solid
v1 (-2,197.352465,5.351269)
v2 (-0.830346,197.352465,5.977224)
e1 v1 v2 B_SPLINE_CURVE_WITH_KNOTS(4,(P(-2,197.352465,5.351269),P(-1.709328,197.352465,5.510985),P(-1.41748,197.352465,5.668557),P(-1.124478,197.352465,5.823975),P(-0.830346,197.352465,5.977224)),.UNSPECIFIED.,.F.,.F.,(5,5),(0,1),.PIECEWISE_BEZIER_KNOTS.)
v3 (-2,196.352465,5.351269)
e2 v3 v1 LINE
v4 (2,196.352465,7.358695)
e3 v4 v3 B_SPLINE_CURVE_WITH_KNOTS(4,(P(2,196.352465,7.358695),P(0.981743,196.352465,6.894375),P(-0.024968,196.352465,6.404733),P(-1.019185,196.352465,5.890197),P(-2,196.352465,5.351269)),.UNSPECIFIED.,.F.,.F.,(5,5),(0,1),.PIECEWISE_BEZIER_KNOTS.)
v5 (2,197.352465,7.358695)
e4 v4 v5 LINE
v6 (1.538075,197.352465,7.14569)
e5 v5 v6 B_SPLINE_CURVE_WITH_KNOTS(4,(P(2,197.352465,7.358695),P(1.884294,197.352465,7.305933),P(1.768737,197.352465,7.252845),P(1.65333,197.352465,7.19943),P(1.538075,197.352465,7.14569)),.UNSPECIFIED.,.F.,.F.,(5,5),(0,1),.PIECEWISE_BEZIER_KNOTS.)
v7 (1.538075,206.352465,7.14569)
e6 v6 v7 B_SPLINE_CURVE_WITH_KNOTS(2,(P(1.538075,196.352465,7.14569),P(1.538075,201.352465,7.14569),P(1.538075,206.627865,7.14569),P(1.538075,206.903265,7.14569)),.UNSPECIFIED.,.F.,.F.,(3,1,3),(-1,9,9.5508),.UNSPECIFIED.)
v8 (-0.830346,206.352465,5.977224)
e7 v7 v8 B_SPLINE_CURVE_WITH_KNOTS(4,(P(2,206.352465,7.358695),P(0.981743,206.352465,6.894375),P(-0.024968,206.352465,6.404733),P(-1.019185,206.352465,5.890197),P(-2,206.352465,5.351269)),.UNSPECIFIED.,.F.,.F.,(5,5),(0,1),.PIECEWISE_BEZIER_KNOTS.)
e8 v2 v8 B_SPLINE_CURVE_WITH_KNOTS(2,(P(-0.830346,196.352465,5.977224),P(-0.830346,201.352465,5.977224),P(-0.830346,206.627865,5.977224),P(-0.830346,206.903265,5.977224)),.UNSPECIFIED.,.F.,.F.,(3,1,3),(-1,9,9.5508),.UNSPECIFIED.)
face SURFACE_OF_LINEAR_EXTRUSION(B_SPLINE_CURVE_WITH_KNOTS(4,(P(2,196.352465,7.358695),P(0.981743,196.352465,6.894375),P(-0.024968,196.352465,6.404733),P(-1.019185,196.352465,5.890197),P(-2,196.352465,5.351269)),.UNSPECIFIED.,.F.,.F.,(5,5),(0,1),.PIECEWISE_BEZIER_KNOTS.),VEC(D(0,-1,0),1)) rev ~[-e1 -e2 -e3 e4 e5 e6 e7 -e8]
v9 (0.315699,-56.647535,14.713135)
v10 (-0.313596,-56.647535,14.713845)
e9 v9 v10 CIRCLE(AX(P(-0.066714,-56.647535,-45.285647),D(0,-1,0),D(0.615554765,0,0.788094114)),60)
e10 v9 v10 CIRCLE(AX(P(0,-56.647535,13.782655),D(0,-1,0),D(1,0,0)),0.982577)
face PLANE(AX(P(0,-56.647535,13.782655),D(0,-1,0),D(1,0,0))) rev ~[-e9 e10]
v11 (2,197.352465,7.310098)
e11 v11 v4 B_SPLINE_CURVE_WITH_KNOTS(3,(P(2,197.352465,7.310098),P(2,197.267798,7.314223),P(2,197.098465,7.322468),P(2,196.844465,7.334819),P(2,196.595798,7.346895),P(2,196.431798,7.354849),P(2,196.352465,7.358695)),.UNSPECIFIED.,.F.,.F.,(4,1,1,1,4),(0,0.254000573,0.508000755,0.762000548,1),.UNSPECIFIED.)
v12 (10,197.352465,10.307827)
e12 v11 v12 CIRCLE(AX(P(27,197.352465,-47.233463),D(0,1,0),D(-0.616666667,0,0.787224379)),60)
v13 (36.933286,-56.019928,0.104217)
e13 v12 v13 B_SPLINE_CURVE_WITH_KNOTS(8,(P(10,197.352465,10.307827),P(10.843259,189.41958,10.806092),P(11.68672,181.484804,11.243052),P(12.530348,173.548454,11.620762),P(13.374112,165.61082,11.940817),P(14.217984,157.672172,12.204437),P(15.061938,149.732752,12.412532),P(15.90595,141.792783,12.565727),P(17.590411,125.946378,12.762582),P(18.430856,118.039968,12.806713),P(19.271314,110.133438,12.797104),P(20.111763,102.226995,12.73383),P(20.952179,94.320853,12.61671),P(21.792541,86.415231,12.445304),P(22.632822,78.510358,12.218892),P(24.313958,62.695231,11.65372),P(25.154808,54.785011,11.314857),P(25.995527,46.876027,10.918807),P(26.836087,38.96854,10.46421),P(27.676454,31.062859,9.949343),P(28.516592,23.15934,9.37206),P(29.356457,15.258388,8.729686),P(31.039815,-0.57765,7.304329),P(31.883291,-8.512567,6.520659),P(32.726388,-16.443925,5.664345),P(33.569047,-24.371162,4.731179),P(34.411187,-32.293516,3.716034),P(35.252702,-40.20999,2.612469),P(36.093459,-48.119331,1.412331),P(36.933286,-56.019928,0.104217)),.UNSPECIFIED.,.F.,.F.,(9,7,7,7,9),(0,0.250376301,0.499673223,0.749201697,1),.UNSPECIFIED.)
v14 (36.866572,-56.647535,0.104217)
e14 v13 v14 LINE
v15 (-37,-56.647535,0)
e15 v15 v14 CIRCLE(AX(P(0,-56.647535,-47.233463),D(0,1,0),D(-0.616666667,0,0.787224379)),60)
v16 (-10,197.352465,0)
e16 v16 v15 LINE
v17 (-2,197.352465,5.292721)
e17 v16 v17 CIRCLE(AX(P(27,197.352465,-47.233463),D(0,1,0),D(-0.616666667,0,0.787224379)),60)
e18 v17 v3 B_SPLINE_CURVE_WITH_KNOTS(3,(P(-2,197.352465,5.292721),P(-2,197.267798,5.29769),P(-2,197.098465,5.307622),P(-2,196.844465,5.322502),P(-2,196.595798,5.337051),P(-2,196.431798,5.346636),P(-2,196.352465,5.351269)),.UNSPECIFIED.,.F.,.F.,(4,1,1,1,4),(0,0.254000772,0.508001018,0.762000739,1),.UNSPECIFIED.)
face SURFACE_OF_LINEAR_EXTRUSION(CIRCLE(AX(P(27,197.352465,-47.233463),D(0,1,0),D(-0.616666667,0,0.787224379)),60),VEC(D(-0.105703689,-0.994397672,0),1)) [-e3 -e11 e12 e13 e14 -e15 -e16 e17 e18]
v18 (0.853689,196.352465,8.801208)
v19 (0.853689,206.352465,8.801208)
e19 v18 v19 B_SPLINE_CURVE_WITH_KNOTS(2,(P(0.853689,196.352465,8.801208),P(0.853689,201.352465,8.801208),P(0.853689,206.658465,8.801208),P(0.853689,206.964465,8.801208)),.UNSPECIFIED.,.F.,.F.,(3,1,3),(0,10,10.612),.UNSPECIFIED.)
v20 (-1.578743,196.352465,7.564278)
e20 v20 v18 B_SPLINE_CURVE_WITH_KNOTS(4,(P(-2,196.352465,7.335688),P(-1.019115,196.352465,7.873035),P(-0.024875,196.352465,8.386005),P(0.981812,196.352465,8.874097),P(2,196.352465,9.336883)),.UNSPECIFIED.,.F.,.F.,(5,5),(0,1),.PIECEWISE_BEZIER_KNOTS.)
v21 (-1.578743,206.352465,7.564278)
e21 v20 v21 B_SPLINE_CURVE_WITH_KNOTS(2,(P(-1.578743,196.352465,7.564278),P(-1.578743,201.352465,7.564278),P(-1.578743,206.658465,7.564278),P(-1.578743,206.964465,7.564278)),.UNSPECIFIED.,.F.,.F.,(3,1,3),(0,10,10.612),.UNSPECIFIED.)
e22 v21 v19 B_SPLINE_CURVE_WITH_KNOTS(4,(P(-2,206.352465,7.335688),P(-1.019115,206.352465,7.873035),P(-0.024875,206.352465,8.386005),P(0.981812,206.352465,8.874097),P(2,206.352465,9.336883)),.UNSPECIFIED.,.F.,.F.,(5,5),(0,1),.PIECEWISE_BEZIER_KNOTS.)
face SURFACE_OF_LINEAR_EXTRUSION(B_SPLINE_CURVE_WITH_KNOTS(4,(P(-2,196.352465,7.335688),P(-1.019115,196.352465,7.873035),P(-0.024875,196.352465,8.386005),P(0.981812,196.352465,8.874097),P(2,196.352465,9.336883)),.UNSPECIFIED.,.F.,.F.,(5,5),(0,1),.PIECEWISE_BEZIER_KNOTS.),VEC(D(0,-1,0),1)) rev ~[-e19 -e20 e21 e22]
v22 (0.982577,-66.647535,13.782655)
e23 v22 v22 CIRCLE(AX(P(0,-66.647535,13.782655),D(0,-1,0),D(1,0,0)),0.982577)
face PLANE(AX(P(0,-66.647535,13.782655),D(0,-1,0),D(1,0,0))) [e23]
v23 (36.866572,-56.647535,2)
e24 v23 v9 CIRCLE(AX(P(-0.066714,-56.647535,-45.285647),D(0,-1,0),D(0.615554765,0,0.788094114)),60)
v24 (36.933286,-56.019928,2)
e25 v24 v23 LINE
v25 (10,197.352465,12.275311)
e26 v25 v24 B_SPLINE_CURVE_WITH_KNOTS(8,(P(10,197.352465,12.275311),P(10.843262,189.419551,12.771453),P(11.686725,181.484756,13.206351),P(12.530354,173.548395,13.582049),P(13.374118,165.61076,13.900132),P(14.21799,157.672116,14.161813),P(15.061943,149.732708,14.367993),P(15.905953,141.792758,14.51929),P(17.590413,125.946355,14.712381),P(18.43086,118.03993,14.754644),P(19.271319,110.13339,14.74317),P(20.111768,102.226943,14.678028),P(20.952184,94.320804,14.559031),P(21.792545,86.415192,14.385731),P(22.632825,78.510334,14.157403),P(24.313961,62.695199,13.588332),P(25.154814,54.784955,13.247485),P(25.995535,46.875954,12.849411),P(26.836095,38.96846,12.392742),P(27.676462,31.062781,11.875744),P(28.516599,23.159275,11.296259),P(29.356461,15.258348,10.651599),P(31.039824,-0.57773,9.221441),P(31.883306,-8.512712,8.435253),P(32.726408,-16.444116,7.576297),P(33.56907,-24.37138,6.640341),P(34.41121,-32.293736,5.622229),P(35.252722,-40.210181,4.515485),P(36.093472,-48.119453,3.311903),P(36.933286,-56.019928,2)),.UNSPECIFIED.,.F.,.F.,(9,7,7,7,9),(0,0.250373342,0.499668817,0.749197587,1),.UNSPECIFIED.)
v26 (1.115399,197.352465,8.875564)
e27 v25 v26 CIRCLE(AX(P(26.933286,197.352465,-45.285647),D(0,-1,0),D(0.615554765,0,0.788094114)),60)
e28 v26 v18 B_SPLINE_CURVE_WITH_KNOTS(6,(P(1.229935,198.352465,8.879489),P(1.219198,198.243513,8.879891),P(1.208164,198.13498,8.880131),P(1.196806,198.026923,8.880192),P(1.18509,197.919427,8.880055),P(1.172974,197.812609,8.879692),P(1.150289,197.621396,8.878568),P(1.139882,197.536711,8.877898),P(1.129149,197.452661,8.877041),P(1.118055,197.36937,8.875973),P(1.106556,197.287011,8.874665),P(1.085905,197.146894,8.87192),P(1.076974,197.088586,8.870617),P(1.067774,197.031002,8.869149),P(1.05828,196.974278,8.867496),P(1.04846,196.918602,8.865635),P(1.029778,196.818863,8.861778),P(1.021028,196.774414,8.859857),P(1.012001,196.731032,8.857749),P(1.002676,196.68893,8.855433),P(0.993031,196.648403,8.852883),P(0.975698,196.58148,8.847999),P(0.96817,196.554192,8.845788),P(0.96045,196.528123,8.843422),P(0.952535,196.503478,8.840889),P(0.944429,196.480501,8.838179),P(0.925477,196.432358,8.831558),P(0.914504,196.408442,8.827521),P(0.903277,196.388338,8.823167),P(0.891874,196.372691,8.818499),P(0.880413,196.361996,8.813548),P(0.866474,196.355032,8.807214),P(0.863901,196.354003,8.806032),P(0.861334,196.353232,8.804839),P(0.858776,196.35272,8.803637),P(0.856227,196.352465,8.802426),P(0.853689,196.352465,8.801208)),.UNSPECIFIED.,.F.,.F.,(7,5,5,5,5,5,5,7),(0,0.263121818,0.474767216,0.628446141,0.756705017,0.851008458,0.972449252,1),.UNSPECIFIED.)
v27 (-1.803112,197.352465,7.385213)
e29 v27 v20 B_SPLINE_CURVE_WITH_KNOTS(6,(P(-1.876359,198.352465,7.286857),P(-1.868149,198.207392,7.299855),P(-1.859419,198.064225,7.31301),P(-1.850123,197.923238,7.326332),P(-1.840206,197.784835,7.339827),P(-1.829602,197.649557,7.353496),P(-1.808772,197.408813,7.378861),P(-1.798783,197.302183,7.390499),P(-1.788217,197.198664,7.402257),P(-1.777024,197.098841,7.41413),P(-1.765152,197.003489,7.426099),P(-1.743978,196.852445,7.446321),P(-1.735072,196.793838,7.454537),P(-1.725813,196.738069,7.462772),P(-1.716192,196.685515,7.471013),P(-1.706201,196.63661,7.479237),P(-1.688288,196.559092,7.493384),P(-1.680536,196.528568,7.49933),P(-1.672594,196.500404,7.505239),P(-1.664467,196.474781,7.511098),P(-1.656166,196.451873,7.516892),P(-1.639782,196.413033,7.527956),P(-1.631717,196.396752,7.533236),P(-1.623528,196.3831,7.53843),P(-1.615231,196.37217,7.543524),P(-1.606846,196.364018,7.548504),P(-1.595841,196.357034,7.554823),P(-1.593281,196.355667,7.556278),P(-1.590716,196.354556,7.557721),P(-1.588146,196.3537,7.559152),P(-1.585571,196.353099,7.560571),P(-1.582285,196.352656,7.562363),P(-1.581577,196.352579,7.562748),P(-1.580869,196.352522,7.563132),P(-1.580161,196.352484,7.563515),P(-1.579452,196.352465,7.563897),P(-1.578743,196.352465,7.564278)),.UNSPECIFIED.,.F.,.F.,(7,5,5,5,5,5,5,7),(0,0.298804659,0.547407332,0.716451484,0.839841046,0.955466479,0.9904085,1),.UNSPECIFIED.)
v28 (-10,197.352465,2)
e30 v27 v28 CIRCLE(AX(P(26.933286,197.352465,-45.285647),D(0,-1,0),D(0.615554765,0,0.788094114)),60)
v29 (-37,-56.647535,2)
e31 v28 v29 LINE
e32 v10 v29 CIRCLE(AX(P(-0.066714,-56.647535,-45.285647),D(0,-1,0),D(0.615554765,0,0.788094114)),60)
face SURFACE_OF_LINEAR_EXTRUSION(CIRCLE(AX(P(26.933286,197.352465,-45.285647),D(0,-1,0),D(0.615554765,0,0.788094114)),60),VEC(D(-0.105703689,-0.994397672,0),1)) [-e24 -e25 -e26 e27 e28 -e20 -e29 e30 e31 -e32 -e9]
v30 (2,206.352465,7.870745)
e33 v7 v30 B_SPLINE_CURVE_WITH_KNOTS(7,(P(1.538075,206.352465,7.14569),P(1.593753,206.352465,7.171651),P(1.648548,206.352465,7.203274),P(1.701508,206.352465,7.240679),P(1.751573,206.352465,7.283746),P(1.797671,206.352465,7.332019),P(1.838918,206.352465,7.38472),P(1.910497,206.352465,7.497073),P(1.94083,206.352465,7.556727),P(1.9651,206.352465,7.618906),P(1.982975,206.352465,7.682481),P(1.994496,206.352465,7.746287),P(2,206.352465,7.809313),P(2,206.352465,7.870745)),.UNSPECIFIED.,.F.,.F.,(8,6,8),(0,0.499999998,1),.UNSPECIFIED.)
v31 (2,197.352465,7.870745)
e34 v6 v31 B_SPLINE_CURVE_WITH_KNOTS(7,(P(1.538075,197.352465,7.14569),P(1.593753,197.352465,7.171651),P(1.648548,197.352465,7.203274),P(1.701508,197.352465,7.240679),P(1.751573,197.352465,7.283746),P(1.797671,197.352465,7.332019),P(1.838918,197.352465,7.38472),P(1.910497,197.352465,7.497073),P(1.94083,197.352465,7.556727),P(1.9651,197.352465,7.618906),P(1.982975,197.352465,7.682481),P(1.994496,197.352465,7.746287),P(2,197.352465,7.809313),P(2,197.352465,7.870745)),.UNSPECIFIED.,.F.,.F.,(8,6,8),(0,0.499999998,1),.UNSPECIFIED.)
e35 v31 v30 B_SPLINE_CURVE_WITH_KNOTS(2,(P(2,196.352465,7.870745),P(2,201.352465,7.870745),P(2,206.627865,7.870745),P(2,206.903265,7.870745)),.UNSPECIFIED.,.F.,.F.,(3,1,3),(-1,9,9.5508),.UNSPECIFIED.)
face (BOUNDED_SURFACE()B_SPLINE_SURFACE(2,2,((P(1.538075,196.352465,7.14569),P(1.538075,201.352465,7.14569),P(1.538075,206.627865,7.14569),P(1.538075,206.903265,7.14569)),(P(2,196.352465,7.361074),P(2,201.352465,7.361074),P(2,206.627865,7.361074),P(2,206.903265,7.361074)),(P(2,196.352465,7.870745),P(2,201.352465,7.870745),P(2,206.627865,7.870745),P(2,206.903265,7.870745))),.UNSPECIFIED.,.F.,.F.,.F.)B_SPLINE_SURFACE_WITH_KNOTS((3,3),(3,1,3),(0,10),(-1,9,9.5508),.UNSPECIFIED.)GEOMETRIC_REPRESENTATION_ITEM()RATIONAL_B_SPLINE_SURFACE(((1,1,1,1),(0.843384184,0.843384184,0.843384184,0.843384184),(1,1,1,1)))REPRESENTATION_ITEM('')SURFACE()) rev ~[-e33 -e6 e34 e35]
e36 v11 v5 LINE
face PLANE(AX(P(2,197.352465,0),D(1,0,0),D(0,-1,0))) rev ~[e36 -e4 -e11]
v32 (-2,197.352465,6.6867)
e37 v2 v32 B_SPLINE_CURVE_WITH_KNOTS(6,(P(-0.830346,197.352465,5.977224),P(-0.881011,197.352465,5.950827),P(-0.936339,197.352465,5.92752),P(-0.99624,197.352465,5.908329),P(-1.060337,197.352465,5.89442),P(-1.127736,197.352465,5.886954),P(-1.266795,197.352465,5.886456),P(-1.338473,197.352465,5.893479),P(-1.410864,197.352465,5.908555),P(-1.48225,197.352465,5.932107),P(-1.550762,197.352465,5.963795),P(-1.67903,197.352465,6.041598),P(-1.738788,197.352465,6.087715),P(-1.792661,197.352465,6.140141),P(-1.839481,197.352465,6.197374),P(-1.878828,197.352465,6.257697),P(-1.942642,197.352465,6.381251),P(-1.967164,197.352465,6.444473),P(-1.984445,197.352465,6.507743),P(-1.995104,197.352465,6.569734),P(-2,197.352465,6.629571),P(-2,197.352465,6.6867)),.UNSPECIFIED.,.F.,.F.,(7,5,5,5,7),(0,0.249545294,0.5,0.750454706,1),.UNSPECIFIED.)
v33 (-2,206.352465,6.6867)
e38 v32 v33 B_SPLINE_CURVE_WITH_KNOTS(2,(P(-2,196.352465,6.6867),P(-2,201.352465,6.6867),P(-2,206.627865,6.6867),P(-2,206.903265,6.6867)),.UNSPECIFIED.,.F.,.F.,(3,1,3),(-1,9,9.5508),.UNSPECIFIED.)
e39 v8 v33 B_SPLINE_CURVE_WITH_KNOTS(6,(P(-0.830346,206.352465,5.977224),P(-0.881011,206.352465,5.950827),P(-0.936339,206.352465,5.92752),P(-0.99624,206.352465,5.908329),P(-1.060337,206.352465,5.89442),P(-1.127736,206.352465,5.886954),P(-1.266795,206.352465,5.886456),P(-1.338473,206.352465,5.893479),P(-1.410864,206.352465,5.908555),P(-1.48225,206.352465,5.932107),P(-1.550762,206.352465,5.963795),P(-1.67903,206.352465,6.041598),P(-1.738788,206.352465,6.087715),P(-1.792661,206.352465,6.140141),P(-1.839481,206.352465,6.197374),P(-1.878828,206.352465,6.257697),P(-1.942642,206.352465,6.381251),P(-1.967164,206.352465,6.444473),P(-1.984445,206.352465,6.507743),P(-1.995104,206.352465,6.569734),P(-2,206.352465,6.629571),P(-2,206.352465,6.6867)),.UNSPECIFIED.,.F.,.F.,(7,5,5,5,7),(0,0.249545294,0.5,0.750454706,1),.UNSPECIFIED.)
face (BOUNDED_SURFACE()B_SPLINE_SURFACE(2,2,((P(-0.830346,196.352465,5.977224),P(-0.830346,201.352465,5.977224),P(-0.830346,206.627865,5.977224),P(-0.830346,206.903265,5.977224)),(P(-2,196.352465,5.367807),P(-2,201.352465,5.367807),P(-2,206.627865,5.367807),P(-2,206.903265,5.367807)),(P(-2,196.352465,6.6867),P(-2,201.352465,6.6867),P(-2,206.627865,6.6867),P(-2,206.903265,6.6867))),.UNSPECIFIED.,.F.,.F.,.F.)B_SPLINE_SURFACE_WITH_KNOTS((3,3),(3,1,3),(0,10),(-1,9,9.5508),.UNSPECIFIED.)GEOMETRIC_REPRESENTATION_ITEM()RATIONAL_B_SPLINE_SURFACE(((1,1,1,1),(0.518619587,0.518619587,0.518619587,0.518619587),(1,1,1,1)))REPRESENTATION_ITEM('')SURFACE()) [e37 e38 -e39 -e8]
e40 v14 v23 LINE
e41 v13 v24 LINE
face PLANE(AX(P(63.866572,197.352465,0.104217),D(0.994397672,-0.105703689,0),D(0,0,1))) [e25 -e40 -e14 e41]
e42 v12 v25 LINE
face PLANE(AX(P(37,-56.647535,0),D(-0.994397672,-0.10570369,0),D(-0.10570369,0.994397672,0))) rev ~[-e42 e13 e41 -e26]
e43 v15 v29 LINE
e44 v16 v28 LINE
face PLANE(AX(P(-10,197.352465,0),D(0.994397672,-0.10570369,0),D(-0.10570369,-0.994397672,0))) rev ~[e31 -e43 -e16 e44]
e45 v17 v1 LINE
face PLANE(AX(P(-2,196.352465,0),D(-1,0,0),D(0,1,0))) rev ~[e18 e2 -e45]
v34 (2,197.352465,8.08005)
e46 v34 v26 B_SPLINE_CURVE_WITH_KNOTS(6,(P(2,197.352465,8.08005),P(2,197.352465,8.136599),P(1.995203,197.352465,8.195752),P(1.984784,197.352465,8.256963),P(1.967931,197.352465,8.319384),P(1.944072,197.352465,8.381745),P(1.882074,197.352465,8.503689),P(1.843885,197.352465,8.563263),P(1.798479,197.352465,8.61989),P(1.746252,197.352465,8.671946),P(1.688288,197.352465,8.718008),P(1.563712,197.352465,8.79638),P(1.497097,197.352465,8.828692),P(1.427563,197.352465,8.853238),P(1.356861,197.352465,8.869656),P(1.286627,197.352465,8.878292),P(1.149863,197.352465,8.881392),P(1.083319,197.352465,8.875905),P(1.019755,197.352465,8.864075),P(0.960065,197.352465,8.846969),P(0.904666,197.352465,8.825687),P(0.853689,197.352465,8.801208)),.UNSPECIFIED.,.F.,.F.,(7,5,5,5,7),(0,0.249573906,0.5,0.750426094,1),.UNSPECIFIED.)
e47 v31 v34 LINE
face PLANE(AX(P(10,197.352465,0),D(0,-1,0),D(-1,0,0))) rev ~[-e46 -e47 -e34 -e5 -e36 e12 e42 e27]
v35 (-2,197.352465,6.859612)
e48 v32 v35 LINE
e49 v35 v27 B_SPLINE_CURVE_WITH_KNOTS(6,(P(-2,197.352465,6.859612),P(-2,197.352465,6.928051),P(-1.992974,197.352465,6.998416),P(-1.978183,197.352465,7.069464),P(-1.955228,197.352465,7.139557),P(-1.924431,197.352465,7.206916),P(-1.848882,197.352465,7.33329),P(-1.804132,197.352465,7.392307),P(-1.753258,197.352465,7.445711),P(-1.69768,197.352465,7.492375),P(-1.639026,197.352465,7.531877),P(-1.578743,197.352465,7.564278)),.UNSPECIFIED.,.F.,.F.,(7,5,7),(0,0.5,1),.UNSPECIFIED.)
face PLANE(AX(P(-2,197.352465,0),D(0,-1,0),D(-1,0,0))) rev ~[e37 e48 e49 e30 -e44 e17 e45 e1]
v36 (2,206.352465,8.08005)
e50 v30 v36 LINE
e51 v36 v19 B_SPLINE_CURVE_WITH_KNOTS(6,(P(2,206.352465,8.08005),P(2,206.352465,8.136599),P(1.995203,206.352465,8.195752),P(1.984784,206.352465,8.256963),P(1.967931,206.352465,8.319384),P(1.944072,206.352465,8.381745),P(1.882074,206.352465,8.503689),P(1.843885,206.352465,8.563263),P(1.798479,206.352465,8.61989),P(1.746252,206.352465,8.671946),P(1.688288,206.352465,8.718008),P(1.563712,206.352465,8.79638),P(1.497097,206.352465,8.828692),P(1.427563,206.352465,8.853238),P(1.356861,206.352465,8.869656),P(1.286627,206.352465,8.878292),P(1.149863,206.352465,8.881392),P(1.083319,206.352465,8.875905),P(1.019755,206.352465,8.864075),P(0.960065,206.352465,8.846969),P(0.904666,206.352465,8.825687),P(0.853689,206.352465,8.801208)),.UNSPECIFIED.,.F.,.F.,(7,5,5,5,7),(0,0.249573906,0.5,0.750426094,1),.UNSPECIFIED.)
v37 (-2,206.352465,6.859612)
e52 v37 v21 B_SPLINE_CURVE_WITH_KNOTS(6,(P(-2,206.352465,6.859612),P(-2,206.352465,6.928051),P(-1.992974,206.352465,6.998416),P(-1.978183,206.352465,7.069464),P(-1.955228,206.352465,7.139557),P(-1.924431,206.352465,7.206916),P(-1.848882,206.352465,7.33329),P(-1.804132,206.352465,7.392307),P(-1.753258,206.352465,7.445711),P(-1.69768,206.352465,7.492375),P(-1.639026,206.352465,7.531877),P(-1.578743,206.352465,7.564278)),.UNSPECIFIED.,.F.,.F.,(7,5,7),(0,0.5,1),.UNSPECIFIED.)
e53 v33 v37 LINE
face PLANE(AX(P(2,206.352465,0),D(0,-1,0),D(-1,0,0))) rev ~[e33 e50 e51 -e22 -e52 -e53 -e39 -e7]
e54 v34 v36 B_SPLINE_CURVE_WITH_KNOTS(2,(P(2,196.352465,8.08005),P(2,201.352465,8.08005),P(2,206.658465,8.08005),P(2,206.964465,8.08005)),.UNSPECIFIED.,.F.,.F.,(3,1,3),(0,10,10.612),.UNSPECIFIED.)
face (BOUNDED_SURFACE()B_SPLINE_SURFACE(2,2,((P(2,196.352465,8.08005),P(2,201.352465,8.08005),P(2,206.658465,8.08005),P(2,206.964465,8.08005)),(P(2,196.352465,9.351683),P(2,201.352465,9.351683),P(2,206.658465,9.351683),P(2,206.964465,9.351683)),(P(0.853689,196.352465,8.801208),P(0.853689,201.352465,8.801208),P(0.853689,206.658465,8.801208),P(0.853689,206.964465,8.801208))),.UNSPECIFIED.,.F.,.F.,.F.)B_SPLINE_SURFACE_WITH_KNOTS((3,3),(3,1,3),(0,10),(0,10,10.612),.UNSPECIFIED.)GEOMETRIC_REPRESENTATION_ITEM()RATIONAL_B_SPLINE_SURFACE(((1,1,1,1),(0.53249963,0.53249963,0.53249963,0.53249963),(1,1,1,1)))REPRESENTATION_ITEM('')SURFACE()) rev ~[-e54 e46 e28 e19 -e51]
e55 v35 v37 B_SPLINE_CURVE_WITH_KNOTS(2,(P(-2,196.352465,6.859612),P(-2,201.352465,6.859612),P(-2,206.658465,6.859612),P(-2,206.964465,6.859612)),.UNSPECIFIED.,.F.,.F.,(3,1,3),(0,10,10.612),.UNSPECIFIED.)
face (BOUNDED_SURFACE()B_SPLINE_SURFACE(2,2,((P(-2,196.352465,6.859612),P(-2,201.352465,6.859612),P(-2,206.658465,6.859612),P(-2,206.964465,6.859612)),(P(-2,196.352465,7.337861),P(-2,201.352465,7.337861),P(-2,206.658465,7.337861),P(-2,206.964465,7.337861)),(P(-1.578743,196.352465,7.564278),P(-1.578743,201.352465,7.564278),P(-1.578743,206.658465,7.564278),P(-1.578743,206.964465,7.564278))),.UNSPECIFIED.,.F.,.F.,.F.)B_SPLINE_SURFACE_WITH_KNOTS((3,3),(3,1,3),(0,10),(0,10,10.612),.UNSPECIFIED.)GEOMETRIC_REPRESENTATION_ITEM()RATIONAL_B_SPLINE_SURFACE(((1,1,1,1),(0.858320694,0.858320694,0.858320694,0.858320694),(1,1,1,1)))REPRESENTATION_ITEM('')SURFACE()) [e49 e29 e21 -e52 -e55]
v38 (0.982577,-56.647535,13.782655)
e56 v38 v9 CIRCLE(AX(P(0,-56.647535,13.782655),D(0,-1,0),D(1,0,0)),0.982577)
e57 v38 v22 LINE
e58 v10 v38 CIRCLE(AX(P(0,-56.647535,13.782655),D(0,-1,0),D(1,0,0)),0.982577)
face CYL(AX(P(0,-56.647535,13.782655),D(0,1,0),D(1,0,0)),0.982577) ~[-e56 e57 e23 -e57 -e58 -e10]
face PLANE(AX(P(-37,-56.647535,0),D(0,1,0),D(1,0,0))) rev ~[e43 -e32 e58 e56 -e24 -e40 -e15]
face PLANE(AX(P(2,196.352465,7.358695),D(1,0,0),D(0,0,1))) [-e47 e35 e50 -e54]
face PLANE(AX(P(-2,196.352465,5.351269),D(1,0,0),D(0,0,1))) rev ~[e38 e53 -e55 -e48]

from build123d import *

# Parameters (mm, degrees)
F1_DEPTH = 25
F4_DEPTH = 10
F5_R     = 0.8
F6_R     = 0.9825772789
F7_DEPTH = 10


with BuildPart() as f1:
    # F0 (on Top) → F1 (new body)
    with BuildSketch(Plane.XY):
        Polygon((-37, -56.6475350804), (-2, -56.6475350804), (2, -56.6475350804), (37, -56.6475350804), (10, 197.3524649196), (2, 197.3524649196), (2, 196.3524649196), (-2, 196.3524649196), (-2, 197.3524649196), (-10, 197.3524649196), align=None)
    extrude(amount=F1_DEPTH)

    # F3: sweep along a path in F3_path
    with BuildLine(Plane(origin=(-10, 197.3524649196, 0), x_dir=(0.1057036895, 0.994397672, 0), z_dir=(-0.994397672, 0.1057036895, 0))) as f3_path:
        Line((0, 0), (-255.4310082977, 0))
    # F2 (on face) → F3 (sweep, intersect)
    with BuildSketch(Plane.XZ.offset(56.6475350804)):
        with BuildLine():
            ThreePointArc((-37, 0), (-0.0846525336, 12.7664775684), (36.8665717542, 0.1042166445))
            Line((36.8665717542, 0.1042166445), (36.8665717542, 2))
            ThreePointArc((36.8665717542, 2), (-0.0667141229, 14.7143531892), (-37, 2))
            Line((-37, 2), (-37, 0))
        make_face()
    sweep(path=f3_path.line, mode=Mode.INTERSECT)

    # F4 (add): a face of the model
    f4_faces = [f1.faces().sort_by_distance(p)[0] for p in [
        (-0.0010475513, 196.3524649196, 7.3762184587),
    ]]
    extrude(f4_faces, amount=F4_DEPTH)

    # F5
    f5_edges = [f1.edges().sort_by_distance(p)[0] for p in [
        (2, 201.852465, 7.358695),
        (2, 201.352465, 9.336883),
        (-2, 201.852465, 5.351269),
        (-2, 201.352465, 7.335688),
    ]]
    fillet(f5_edges, radius=F5_R)

    # F6 (on face) → F7 (join)
    with BuildSketch(Plane.XZ.offset(56.6475350804)):
        with Locations((0, 13.7826548889)):
            Circle(F6_R)
    extrude(amount=F7_DEPTH)


solid = f1.part
